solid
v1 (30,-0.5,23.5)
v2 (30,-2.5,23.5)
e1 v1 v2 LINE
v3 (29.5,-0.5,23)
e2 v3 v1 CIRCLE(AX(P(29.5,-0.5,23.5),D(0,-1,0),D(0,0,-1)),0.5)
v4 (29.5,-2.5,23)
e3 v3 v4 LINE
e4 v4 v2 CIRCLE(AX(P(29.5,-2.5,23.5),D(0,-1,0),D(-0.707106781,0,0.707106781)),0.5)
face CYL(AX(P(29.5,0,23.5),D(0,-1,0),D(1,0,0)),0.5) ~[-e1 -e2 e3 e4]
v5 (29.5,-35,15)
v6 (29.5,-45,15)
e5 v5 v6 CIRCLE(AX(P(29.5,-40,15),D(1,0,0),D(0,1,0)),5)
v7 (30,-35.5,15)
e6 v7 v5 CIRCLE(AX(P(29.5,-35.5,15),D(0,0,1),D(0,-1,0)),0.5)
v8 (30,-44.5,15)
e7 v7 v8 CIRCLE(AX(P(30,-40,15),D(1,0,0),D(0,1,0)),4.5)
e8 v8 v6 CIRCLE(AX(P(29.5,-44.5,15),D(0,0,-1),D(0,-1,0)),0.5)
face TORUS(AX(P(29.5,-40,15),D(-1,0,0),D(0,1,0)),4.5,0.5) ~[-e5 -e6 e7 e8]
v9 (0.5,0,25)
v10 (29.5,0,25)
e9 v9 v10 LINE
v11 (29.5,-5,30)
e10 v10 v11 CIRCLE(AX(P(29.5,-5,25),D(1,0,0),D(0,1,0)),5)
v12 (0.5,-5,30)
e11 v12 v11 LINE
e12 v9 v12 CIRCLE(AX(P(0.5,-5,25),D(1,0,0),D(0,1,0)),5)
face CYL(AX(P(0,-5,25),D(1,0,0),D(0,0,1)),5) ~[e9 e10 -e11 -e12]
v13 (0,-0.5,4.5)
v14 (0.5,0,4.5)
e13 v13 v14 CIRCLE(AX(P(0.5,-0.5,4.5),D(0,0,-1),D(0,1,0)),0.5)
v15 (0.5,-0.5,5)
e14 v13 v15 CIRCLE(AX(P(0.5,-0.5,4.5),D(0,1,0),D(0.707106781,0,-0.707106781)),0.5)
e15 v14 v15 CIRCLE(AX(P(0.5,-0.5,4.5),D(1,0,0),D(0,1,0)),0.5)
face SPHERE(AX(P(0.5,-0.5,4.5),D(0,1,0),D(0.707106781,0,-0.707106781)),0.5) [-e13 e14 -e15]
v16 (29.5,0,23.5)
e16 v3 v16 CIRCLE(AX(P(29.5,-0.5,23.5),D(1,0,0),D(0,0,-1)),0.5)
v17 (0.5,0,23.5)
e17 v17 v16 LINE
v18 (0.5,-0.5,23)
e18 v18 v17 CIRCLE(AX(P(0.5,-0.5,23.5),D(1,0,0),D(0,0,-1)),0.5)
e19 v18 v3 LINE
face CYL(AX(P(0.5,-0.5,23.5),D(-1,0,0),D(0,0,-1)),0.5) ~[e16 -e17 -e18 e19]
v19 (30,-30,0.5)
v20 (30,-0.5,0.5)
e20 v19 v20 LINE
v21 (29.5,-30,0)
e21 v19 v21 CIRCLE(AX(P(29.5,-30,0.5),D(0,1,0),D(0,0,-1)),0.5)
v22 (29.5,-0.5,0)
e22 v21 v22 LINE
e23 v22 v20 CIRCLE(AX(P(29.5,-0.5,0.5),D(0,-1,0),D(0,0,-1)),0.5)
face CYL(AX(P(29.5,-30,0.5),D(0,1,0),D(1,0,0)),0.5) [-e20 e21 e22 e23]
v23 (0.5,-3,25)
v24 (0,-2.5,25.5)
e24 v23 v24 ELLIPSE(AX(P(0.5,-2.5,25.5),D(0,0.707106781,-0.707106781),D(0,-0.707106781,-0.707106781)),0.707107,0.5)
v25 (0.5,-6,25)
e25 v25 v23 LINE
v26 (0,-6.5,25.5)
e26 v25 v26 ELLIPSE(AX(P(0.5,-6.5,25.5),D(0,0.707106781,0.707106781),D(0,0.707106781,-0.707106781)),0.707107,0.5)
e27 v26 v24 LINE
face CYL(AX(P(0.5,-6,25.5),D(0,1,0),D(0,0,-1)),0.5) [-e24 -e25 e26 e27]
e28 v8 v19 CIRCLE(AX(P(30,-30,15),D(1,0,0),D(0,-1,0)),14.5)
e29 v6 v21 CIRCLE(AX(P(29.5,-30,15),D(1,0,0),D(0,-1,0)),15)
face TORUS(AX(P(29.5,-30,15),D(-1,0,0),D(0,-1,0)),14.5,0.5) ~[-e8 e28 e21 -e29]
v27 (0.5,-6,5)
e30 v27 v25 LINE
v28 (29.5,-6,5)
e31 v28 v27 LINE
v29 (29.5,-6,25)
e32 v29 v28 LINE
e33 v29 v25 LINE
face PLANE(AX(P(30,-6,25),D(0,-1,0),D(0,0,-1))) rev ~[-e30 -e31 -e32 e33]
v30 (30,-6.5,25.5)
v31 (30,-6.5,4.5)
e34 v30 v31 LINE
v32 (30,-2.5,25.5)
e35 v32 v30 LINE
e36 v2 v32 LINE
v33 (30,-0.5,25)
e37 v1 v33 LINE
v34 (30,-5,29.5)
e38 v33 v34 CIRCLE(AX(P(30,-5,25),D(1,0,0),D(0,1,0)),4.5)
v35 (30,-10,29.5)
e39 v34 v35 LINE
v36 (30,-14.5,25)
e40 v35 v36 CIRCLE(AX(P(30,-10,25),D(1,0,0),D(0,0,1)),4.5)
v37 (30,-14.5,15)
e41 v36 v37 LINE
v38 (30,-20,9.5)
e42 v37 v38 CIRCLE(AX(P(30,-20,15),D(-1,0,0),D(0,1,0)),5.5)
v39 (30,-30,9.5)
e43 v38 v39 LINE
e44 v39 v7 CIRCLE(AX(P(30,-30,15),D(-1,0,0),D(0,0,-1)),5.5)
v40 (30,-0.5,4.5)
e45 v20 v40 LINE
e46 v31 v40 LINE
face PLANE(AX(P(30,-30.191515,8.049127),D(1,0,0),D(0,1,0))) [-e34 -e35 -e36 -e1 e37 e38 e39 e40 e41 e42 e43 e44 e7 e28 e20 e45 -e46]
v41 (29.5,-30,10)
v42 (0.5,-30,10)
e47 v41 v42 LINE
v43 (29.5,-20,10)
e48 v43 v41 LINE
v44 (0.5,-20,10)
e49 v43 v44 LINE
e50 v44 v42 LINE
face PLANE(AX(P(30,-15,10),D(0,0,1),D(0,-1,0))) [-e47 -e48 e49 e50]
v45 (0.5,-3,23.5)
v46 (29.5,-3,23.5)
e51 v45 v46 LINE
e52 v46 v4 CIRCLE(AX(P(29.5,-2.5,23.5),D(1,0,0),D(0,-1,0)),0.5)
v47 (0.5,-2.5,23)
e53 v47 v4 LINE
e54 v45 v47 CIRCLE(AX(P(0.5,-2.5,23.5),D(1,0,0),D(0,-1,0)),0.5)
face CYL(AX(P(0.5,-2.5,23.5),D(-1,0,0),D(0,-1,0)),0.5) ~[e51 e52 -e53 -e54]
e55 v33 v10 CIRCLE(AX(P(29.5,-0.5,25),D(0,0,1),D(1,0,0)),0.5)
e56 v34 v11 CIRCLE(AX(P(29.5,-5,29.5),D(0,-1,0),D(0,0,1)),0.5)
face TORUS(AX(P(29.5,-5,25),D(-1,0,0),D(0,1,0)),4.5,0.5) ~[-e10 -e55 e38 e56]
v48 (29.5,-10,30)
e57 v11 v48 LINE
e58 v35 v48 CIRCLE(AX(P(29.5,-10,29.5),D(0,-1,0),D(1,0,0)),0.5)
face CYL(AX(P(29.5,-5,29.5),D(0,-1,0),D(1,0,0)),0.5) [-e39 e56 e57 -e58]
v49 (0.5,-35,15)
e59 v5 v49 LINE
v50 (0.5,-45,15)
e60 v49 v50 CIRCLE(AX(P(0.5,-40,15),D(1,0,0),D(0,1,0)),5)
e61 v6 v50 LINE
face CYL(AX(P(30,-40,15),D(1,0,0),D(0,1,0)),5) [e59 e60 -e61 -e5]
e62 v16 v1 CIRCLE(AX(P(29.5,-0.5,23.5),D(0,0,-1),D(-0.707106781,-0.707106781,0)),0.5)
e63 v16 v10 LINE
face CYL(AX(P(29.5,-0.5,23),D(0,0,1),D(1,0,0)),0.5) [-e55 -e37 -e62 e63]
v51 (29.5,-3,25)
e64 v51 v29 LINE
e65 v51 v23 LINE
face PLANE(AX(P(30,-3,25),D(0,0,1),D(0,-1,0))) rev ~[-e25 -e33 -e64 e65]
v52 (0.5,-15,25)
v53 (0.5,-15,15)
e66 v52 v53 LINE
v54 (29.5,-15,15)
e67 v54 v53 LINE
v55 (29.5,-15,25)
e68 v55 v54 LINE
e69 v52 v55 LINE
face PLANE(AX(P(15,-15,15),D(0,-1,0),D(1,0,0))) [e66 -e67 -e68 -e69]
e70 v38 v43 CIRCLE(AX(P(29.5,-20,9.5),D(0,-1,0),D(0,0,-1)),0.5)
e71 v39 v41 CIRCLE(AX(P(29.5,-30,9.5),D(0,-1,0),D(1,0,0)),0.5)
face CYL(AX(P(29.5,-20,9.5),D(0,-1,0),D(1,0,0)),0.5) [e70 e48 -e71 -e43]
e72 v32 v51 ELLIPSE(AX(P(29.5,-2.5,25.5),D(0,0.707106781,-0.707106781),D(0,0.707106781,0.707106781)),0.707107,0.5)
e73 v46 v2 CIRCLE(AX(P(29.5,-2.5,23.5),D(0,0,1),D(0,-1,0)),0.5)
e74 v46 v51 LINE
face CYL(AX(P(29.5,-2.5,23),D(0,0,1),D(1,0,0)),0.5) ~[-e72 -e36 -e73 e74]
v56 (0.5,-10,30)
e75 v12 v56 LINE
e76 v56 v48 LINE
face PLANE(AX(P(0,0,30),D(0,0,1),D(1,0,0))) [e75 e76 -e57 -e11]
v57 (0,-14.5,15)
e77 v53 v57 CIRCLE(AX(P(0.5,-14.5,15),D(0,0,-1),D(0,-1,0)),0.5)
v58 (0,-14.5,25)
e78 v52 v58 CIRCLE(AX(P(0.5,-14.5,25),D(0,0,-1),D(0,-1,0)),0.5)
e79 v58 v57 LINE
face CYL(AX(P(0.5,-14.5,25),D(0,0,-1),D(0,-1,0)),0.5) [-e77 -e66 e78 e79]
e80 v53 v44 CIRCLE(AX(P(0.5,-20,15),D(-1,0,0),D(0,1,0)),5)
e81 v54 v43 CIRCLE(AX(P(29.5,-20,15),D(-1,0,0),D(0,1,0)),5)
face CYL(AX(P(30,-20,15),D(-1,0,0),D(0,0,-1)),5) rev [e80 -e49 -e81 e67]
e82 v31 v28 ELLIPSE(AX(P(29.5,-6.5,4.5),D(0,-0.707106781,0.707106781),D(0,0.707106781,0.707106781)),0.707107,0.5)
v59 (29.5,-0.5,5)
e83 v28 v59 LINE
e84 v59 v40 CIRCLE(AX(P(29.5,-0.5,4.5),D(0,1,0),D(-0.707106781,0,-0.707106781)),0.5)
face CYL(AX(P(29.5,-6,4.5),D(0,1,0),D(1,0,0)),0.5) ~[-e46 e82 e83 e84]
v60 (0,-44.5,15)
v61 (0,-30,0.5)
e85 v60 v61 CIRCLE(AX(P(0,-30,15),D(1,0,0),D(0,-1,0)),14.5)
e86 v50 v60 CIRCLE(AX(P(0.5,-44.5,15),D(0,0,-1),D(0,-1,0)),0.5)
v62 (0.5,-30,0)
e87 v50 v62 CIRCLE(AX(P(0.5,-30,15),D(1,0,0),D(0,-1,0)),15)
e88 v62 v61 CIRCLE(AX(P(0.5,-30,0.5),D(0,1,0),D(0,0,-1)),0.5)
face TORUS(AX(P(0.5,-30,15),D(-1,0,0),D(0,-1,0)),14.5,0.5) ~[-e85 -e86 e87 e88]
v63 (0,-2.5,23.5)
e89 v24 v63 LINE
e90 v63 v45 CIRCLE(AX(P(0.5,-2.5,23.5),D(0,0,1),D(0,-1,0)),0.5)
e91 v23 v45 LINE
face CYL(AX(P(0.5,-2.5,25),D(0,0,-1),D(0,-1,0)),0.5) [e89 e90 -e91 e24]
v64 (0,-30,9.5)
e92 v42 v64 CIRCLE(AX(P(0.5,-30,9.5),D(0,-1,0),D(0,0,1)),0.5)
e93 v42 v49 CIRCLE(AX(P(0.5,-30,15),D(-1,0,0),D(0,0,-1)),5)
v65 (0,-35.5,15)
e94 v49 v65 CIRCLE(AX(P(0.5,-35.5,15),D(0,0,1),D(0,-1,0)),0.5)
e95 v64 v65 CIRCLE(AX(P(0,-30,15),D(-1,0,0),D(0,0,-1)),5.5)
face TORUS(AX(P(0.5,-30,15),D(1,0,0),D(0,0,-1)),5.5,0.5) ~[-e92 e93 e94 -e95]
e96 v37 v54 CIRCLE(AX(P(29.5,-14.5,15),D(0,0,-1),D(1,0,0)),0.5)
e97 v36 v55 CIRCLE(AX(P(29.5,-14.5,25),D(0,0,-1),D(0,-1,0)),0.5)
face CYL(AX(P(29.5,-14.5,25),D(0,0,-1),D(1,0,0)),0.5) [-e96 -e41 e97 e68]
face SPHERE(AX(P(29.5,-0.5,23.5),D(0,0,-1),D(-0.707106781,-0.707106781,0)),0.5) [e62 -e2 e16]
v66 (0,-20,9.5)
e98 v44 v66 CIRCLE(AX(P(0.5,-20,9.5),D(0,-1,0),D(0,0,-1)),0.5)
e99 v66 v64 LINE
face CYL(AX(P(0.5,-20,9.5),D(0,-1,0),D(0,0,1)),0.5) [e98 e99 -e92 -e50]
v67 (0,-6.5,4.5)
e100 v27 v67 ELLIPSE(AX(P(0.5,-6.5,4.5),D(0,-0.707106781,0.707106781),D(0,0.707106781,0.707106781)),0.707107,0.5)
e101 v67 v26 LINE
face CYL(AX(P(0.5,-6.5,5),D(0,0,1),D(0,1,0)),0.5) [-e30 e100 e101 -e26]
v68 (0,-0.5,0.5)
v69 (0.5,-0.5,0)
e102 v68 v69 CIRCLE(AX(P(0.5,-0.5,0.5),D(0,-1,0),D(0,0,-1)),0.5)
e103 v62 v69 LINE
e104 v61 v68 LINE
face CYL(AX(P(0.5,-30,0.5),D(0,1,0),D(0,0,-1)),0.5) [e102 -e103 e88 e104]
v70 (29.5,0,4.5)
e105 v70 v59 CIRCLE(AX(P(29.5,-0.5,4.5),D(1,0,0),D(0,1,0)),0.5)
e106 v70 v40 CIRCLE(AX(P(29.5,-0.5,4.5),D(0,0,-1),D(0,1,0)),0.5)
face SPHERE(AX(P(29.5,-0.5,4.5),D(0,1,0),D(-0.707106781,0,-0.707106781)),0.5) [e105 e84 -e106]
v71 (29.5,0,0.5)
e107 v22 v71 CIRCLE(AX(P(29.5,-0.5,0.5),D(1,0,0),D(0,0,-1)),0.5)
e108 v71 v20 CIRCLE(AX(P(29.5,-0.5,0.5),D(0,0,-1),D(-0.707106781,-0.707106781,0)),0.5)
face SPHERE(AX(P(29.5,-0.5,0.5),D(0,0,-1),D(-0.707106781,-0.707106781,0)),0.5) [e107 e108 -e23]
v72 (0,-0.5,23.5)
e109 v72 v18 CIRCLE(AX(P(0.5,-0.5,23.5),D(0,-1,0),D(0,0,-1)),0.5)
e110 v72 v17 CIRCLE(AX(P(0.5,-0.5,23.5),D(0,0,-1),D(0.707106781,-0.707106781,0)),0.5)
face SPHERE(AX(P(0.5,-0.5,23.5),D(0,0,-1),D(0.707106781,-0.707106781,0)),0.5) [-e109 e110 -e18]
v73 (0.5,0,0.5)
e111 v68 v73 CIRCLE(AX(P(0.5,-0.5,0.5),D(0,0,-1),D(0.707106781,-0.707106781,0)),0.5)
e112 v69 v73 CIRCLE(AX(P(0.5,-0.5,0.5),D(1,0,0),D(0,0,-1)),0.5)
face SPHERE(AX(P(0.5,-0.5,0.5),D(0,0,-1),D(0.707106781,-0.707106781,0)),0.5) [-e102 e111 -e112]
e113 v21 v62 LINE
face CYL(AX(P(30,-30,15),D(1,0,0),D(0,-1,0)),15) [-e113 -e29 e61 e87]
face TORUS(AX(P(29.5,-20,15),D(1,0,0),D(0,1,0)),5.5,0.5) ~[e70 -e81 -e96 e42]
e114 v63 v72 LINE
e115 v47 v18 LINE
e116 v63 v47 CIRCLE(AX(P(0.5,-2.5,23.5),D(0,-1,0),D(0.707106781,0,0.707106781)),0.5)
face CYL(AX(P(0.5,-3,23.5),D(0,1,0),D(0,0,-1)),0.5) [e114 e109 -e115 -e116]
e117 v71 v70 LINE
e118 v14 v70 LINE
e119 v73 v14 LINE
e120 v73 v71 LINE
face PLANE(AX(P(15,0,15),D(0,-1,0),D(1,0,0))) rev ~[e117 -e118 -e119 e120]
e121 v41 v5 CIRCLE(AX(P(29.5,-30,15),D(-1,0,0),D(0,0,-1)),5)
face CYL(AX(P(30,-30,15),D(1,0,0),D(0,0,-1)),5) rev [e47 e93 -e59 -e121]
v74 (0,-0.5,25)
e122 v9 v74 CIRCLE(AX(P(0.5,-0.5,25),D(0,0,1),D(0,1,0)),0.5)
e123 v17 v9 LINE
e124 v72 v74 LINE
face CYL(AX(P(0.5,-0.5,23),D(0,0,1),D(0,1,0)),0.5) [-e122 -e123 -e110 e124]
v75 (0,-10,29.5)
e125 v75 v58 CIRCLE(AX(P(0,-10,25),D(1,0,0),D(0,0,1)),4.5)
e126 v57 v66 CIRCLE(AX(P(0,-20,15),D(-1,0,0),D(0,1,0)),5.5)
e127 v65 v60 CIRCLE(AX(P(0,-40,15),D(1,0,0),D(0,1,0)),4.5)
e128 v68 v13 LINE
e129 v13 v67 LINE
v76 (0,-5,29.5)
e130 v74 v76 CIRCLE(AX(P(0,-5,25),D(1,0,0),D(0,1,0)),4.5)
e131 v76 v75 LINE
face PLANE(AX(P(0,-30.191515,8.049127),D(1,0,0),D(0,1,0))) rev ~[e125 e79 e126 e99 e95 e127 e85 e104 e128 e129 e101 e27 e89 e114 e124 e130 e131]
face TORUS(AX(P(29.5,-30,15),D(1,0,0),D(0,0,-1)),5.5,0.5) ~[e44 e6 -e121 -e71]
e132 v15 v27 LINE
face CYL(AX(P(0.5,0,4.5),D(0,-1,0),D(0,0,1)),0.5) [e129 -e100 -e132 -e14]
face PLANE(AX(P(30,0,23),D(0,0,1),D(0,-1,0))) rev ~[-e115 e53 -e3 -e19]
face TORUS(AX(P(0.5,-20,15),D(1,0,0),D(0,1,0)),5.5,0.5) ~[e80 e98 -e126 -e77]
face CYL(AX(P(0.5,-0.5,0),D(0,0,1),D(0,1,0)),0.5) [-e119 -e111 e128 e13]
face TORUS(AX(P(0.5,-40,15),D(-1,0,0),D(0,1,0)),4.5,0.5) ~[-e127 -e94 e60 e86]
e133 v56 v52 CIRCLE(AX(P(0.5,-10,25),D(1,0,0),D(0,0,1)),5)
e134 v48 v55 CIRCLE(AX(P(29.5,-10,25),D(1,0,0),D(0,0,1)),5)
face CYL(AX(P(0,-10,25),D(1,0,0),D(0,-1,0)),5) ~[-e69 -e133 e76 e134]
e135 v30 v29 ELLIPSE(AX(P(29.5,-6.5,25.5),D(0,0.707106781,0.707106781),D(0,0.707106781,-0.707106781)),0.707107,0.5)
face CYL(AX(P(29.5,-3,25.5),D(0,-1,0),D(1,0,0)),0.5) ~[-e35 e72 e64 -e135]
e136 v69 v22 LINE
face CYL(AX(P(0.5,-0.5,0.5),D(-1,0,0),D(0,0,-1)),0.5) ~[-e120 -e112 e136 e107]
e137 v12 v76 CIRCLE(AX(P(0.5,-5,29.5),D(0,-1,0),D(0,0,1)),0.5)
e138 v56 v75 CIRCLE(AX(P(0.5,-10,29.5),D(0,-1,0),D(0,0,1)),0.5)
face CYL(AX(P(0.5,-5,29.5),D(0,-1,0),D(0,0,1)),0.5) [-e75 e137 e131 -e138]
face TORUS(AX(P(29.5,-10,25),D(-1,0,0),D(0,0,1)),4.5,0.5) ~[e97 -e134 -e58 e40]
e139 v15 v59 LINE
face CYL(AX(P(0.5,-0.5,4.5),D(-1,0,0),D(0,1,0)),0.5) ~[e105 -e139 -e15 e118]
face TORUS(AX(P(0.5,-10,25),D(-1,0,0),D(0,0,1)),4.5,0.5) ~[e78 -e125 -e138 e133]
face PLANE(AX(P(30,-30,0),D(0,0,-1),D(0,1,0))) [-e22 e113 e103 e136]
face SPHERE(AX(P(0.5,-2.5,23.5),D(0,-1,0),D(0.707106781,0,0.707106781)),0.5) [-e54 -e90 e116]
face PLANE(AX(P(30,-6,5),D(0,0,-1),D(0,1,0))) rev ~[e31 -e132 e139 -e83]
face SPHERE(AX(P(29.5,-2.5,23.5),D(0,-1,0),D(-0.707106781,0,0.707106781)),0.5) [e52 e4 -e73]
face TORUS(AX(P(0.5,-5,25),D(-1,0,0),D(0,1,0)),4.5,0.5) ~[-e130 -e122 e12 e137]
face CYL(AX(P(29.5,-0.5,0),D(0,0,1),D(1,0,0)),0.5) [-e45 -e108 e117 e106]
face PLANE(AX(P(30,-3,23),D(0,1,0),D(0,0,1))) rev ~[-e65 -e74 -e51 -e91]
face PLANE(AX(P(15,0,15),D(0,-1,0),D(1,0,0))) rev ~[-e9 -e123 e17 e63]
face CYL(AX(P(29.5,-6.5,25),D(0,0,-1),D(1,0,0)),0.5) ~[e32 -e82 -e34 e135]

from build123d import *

# Parameters (mm, degrees)
F0_W         = 30
F0_H         = 30
F1_DEPTH     = 15
F3_DEPTH     = 30.001
F5_DEPTH     = 30
F6_R         = 5
F7_R         = 0.5
F8_T1_DEPTH  = 29
F8_S5_W      = 0.5
F8_S5_H      = 0.5
F8_T6_DEPTH  = 0.5
F8_S11_W     = 0.5
F8_S11_H     = 0.5
F8_T12_DEPTH = 0.5
F8_S17_W     = 0.5
F8_S17_H     = 0.5
F8_T18_DEPTH = 0.5
F8_S23_W     = 0.5
F8_S23_H     = 0.5
F8_T24_DEPTH = 0.5
F8_S29_W     = 0.5
F8_S29_H     = 0.5
F8_T30_DEPTH = 0.5
F8_S35_W     = 0.5
F8_S35_H     = 0.5
F8_T36_DEPTH = 0.5
F8_S41_W     = 0.5
F8_S41_H     = 0.5
F8_T42_DEPTH = 0.5
F8_S47_W     = 0.5
F8_S47_H     = 0.5
F8_T48_DEPTH = 0.5


# Not quite as in the source:
# - a fillet or chamfer that OpenCascade refuses, or shapes differently, is made with other operations: its cross-section is extruded or revolved along the edge and cut away or added


with BuildPart() as f1:
    # F0 (on Front) → F1 (new body)
    with BuildSketch(Plane.XZ):
        with Locations((15, 15)):
            Rectangle(F0_W, F0_H)
    extrude(amount=F1_DEPTH)

    # F2 (on face) → F3 (cut, through all)
    with BuildSketch(Plane.YZ.offset(30)):
        Polygon((-6, 5), (0, 5), (0, 23), (-3, 23), (-3, 25), (-6, 25), align=None)
    extrude(amount=-F3_DEPTH, mode=Mode.SUBTRACT)

    # F4 (on face) → F5 (join, through all)
    with BuildSketch(Plane.YZ.offset(30)):
        with BuildLine():
            Line((-30, 0), (-15, 0))
            Line((-15, 0), (-15, 10))
            Line((-15, 10), (-30, 10))
            ThreePointArc((-30, 10), (-33.5355339059, 11.4644660941), (-35, 15))
            ThreePointArc((-35, 15), (-40, 20), (-45, 15))
            ThreePointArc((-45, 15), (-40.6066017178, 4.3933982822), (-30, 0))
        make_face()
    extrude(amount=-F5_DEPTH)

    # F6
    f6_edges = [f1.edges().sort_by_distance(p)[0] for p in [
        (15, -15, 10),
        (15, -15, 30),
        (15, 0, 30),
    ]]
    fillet(f6_edges, radius=F6_R)

    # F7
    f7_edges = [f1.edges().sort_by_distance(p)[0] for p in [
        (30, -25, 10),
        (30, -16.464466, 11.464466),
        (30, -33.535534, 11.464466),
        (30, -15, 20),
        (30, -40, 20),
        (30, -13.535534, 28.535534),
        (30, -40.606602, 4.393398),
        (30, -7.5, 30),
        (30, -15, 0),
        (30, -1.464466, 28.535534),
        (30, 0, 2.5),
        (30, 0, 24),
        (30, -3, 5),
        (30, -1.5, 23),
        (30, -6, 15),
        (30, -3, 24),
        (30, -4.5, 25),
        (0, 0, 24),
        (0, -1.464466, 28.535534),
        (0, -1.5, 23),
        (0, -7.5, 30),
        (0, -3, 24),
        (0, -13.535534, 28.535534),
        (0, -4.5, 25),
        (0, -15, 20),
        (0, -6, 15),
        (0, -16.464466, 11.464466),
        (0, -3, 5),
        (0, -25, 10),
        (0, 0, 2.5),
        (0, -33.535534, 11.464466),
        (0, -15, 0),
        (0, -40, 20),
        (0, -40.606602, 4.393398),
    ]]
    fillet(f7_edges, radius=F7_R)

    # F8: fillet of radius 0.5 on 4 edges, made by hand

    # F8_s2 → F8_t1 (cut)
    with BuildSketch(Plane.YZ.offset(0.5)):
        with BuildLine():
            ThreePointArc((0, 4.5), (-0.1464466094, 4.8535533906), (-0.5, 5))
            Line((-0.5, 5), (0, 5))
            Line((0, 5), (0, 4.5))
        make_face()
        with BuildLine():
            ThreePointArc((-0.5, 0), (-0.1464466094, 0.1464466094), (0, 0.5))
            Line((0, 0.5), (0, 0))
            Line((0, 0), (-0.5, 0))
        make_face()
        with BuildLine():
            ThreePointArc((-0.5, 23), (-0.1464466094, 23.1464466094), (0, 23.5))
            Line((0, 23.5), (0, 23))
            Line((0, 23), (-0.5, 23))
        make_face()
        with BuildLine():
            ThreePointArc((-3, 23.5), (-2.8535533906, 23.1464466094), (-2.5, 23))
            Line((-2.5, 23), (-3, 23))
            Line((-3, 23), (-3, 23.5))
        make_face()
    extrude(amount=F8_T1_DEPTH, mode=Mode.SUBTRACT)


with BuildPart() as f8_tool4:
    # F8_s5 → F8_t6 (new body)
    with BuildSketch(Plane.XZ.offset(2.5)):
        with Locations((29.75, 23.25)):
            Rectangle(F8_S5_W, F8_S5_H)
    extrude(amount=F8_T6_DEPTH)

    # F8_s7 → F8_t8 (revolve, cut)
    with BuildSketch(Plane(origin=(29.5, -2.5, 23.5), x_dir=(-0.7071067812, 0, 0.7071067812), z_dir=(0.7071067812, 0, 0.7071067812))):
        with BuildLine():
            ThreePointArc((0, -0.5), (0.5, 0), (0, 0.5))
            Line((0, 0.5), (0, -0.5))
        make_face()
    revolve(axis=Axis((29.5, -2.5, 23.5), (0, -1, 0)), mode=Mode.SUBTRACT)


with BuildPart() as f1_1:
    add(f1.part)

    # F8_t3: cut F8_tool4
    add(f8_tool4.part, mode=Mode.SUBTRACT)


with BuildPart() as f8_tool10:
    # F8_s11 → F8_t12 (new body)
    with BuildSketch(Plane.XZ.offset(2.5)):
        with Locations((0.25, 23.25)):
            Rectangle(F8_S11_W, F8_S11_H)
    extrude(amount=F8_T12_DEPTH)

    # F8_s13 → F8_t14 (revolve, cut)
    with BuildSketch(Plane(origin=(0.5, -2.5, 23.5), x_dir=(0.7071067812, 0, 0.7071067812), z_dir=(0.7071067812, 0, -0.7071067812))):
        with BuildLine():
            ThreePointArc((0, -0.5), (0.5, 0), (0, 0.5))
            Line((0, 0.5), (0, -0.5))
        make_face()
    revolve(axis=Axis((0.5, -2.5, 23.5), (0, -1, 0)), mode=Mode.SUBTRACT)


with BuildPart() as f1_2:
    add(f1_1.part)

    # F8_t9: cut F8_tool10
    add(f8_tool10.part, mode=Mode.SUBTRACT)


with BuildPart() as f8_tool16:
    # F8_s17 → F8_t18 (new body)
    with BuildSketch(Plane.XY.offset(23.5)):
        with Locations((29.75, -0.25)):
            Rectangle(F8_S17_W, F8_S17_H)
    extrude(amount=-F8_T18_DEPTH)

    # F8_s19 → F8_t20 (revolve, cut)
    with BuildSketch(Plane(origin=(29.5, -0.5, 23.5), x_dir=(-0.7071067812, -0.7071067812, 0), z_dir=(0.7071067812, -0.7071067812, 0))):
        with BuildLine():
            ThreePointArc((0, -0.5), (0.5, 0), (0, 0.5))
            Line((0, 0.5), (0, -0.5))
        make_face()
    revolve(axis=Axis((29.5, -0.5, 23.5), (0, 0, -1)), mode=Mode.SUBTRACT)


with BuildPart() as f1_3:
    add(f1_2.part)

    # F8_t15: cut F8_tool16
    add(f8_tool16.part, mode=Mode.SUBTRACT)


with BuildPart() as f8_tool22:
    # F8_s23 → F8_t24 (new body)
    with BuildSketch(Plane.XY.offset(23.5)):
        with Locations((0.25, -0.25)):
            Rectangle(F8_S23_W, F8_S23_H)
    extrude(amount=-F8_T24_DEPTH)

    # F8_s25 → F8_t26 (revolve, cut)
    with BuildSketch(Plane(origin=(0.5, -0.5, 23.5), x_dir=(0.7071067812, -0.7071067812, 0), z_dir=(0.7071067812, 0.7071067812, 0))):
        with BuildLine():
            ThreePointArc((0, -0.5), (0.5, 0), (0, 0.5))
            Line((0, 0.5), (0, -0.5))
        make_face()
    revolve(axis=Axis((0.5, -0.5, 23.5), (0, 0, -1)), mode=Mode.SUBTRACT)


with BuildPart() as f1_4:
    add(f1_3.part)

    # F8_t21: cut F8_tool22
    add(f8_tool22.part, mode=Mode.SUBTRACT)


with BuildPart() as f8_tool28:
    # F8_s29 → F8_t30 (new body)
    with BuildSketch(Plane.XY.offset(0.5)):
        with Locations((0.25, -0.25)):
            Rectangle(F8_S29_W, F8_S29_H)
    extrude(amount=-F8_T30_DEPTH)

    # F8_s31 → F8_t32 (revolve, cut)
    with BuildSketch(Plane(origin=(0.5, -0.5, 0.5), x_dir=(0.7071067812, -0.7071067812, 0), z_dir=(0.7071067812, 0.7071067812, 0))):
        with BuildLine():
            ThreePointArc((0, -0.5), (0.5, 0), (0, 0.5))
            Line((0, 0.5), (0, -0.5))
        make_face()
    revolve(axis=Axis((0.5, -0.5, 0.5), (0, 0, -1)), mode=Mode.SUBTRACT)


with BuildPart() as f1_5:
    add(f1_4.part)

    # F8_t27: cut F8_tool28
    add(f8_tool28.part, mode=Mode.SUBTRACT)


with BuildPart() as f8_tool34:
    # F8_s35 → F8_t36 (new body)
    with BuildSketch(Plane.XY.offset(0.5)):
        with Locations((29.75, -0.25)):
            Rectangle(F8_S35_W, F8_S35_H)
    extrude(amount=-F8_T36_DEPTH)

    # F8_s37 → F8_t38 (revolve, cut)
    with BuildSketch(Plane(origin=(29.5, -0.5, 0.5), x_dir=(-0.7071067812, -0.7071067812, 0), z_dir=(0.7071067812, -0.7071067812, 0))):
        with BuildLine():
            ThreePointArc((0, -0.5), (0.5, 0), (0, 0.5))
            Line((0, 0.5), (0, -0.5))
        make_face()
    revolve(axis=Axis((29.5, -0.5, 0.5), (0, 0, -1)), mode=Mode.SUBTRACT)


with BuildPart() as f1_6:
    add(f1_5.part)

    # F8_t33: cut F8_tool34
    add(f8_tool34.part, mode=Mode.SUBTRACT)


with BuildPart() as f8_tool40:
    # F8_s41 → F8_t42 (new body)
    with BuildSketch(Plane.XZ.offset(0.5)):
        with Locations((29.75, 4.75)):
            Rectangle(F8_S41_W, F8_S41_H)
    extrude(amount=-F8_T42_DEPTH)

    # F8_s43 → F8_t44 (revolve, cut)
    with BuildSketch(Plane(origin=(29.5, -0.5, 4.5), x_dir=(-0.7071067812, 0, -0.7071067812), z_dir=(0.7071067812, 0, -0.7071067812))):
        with BuildLine():
            ThreePointArc((0, -0.5), (0.5, 0), (0, 0.5))
            Line((0, 0.5), (0, -0.5))
        make_face()
    revolve(axis=Axis((29.5, -0.5, 4.5), (0, 1, 0)), mode=Mode.SUBTRACT)


with BuildPart() as f1_7:
    add(f1_6.part)

    # F8_t39: cut F8_tool40
    add(f8_tool40.part, mode=Mode.SUBTRACT)


with BuildPart() as f8_tool46:
    # F8_s47 → F8_t48 (new body)
    with BuildSketch(Plane.XZ.offset(0.5)):
        with Locations((0.25, 4.75)):
            Rectangle(F8_S47_W, F8_S47_H)
    extrude(amount=-F8_T48_DEPTH)

    # F8_s49 → F8_t50 (revolve, cut)
    with BuildSketch(Plane(origin=(0.5, -0.5, 4.5), x_dir=(0.7071067812, 0, -0.7071067812), z_dir=(0.7071067812, 0, 0.7071067812))):
        with BuildLine():
            ThreePointArc((0, -0.5), (0.5, 0), (0, 0.5))
            Line((0, 0.5), (0, -0.5))
        make_face()
    revolve(axis=Axis((0.5, -0.5, 4.5), (0, 1, 0)), mode=Mode.SUBTRACT)


with BuildPart() as f1_8:
    add(f1_7.part)

    # F8_t45: cut F8_tool46
    add(f8_tool46.part, mode=Mode.SUBTRACT)


solid = f1_8.part
